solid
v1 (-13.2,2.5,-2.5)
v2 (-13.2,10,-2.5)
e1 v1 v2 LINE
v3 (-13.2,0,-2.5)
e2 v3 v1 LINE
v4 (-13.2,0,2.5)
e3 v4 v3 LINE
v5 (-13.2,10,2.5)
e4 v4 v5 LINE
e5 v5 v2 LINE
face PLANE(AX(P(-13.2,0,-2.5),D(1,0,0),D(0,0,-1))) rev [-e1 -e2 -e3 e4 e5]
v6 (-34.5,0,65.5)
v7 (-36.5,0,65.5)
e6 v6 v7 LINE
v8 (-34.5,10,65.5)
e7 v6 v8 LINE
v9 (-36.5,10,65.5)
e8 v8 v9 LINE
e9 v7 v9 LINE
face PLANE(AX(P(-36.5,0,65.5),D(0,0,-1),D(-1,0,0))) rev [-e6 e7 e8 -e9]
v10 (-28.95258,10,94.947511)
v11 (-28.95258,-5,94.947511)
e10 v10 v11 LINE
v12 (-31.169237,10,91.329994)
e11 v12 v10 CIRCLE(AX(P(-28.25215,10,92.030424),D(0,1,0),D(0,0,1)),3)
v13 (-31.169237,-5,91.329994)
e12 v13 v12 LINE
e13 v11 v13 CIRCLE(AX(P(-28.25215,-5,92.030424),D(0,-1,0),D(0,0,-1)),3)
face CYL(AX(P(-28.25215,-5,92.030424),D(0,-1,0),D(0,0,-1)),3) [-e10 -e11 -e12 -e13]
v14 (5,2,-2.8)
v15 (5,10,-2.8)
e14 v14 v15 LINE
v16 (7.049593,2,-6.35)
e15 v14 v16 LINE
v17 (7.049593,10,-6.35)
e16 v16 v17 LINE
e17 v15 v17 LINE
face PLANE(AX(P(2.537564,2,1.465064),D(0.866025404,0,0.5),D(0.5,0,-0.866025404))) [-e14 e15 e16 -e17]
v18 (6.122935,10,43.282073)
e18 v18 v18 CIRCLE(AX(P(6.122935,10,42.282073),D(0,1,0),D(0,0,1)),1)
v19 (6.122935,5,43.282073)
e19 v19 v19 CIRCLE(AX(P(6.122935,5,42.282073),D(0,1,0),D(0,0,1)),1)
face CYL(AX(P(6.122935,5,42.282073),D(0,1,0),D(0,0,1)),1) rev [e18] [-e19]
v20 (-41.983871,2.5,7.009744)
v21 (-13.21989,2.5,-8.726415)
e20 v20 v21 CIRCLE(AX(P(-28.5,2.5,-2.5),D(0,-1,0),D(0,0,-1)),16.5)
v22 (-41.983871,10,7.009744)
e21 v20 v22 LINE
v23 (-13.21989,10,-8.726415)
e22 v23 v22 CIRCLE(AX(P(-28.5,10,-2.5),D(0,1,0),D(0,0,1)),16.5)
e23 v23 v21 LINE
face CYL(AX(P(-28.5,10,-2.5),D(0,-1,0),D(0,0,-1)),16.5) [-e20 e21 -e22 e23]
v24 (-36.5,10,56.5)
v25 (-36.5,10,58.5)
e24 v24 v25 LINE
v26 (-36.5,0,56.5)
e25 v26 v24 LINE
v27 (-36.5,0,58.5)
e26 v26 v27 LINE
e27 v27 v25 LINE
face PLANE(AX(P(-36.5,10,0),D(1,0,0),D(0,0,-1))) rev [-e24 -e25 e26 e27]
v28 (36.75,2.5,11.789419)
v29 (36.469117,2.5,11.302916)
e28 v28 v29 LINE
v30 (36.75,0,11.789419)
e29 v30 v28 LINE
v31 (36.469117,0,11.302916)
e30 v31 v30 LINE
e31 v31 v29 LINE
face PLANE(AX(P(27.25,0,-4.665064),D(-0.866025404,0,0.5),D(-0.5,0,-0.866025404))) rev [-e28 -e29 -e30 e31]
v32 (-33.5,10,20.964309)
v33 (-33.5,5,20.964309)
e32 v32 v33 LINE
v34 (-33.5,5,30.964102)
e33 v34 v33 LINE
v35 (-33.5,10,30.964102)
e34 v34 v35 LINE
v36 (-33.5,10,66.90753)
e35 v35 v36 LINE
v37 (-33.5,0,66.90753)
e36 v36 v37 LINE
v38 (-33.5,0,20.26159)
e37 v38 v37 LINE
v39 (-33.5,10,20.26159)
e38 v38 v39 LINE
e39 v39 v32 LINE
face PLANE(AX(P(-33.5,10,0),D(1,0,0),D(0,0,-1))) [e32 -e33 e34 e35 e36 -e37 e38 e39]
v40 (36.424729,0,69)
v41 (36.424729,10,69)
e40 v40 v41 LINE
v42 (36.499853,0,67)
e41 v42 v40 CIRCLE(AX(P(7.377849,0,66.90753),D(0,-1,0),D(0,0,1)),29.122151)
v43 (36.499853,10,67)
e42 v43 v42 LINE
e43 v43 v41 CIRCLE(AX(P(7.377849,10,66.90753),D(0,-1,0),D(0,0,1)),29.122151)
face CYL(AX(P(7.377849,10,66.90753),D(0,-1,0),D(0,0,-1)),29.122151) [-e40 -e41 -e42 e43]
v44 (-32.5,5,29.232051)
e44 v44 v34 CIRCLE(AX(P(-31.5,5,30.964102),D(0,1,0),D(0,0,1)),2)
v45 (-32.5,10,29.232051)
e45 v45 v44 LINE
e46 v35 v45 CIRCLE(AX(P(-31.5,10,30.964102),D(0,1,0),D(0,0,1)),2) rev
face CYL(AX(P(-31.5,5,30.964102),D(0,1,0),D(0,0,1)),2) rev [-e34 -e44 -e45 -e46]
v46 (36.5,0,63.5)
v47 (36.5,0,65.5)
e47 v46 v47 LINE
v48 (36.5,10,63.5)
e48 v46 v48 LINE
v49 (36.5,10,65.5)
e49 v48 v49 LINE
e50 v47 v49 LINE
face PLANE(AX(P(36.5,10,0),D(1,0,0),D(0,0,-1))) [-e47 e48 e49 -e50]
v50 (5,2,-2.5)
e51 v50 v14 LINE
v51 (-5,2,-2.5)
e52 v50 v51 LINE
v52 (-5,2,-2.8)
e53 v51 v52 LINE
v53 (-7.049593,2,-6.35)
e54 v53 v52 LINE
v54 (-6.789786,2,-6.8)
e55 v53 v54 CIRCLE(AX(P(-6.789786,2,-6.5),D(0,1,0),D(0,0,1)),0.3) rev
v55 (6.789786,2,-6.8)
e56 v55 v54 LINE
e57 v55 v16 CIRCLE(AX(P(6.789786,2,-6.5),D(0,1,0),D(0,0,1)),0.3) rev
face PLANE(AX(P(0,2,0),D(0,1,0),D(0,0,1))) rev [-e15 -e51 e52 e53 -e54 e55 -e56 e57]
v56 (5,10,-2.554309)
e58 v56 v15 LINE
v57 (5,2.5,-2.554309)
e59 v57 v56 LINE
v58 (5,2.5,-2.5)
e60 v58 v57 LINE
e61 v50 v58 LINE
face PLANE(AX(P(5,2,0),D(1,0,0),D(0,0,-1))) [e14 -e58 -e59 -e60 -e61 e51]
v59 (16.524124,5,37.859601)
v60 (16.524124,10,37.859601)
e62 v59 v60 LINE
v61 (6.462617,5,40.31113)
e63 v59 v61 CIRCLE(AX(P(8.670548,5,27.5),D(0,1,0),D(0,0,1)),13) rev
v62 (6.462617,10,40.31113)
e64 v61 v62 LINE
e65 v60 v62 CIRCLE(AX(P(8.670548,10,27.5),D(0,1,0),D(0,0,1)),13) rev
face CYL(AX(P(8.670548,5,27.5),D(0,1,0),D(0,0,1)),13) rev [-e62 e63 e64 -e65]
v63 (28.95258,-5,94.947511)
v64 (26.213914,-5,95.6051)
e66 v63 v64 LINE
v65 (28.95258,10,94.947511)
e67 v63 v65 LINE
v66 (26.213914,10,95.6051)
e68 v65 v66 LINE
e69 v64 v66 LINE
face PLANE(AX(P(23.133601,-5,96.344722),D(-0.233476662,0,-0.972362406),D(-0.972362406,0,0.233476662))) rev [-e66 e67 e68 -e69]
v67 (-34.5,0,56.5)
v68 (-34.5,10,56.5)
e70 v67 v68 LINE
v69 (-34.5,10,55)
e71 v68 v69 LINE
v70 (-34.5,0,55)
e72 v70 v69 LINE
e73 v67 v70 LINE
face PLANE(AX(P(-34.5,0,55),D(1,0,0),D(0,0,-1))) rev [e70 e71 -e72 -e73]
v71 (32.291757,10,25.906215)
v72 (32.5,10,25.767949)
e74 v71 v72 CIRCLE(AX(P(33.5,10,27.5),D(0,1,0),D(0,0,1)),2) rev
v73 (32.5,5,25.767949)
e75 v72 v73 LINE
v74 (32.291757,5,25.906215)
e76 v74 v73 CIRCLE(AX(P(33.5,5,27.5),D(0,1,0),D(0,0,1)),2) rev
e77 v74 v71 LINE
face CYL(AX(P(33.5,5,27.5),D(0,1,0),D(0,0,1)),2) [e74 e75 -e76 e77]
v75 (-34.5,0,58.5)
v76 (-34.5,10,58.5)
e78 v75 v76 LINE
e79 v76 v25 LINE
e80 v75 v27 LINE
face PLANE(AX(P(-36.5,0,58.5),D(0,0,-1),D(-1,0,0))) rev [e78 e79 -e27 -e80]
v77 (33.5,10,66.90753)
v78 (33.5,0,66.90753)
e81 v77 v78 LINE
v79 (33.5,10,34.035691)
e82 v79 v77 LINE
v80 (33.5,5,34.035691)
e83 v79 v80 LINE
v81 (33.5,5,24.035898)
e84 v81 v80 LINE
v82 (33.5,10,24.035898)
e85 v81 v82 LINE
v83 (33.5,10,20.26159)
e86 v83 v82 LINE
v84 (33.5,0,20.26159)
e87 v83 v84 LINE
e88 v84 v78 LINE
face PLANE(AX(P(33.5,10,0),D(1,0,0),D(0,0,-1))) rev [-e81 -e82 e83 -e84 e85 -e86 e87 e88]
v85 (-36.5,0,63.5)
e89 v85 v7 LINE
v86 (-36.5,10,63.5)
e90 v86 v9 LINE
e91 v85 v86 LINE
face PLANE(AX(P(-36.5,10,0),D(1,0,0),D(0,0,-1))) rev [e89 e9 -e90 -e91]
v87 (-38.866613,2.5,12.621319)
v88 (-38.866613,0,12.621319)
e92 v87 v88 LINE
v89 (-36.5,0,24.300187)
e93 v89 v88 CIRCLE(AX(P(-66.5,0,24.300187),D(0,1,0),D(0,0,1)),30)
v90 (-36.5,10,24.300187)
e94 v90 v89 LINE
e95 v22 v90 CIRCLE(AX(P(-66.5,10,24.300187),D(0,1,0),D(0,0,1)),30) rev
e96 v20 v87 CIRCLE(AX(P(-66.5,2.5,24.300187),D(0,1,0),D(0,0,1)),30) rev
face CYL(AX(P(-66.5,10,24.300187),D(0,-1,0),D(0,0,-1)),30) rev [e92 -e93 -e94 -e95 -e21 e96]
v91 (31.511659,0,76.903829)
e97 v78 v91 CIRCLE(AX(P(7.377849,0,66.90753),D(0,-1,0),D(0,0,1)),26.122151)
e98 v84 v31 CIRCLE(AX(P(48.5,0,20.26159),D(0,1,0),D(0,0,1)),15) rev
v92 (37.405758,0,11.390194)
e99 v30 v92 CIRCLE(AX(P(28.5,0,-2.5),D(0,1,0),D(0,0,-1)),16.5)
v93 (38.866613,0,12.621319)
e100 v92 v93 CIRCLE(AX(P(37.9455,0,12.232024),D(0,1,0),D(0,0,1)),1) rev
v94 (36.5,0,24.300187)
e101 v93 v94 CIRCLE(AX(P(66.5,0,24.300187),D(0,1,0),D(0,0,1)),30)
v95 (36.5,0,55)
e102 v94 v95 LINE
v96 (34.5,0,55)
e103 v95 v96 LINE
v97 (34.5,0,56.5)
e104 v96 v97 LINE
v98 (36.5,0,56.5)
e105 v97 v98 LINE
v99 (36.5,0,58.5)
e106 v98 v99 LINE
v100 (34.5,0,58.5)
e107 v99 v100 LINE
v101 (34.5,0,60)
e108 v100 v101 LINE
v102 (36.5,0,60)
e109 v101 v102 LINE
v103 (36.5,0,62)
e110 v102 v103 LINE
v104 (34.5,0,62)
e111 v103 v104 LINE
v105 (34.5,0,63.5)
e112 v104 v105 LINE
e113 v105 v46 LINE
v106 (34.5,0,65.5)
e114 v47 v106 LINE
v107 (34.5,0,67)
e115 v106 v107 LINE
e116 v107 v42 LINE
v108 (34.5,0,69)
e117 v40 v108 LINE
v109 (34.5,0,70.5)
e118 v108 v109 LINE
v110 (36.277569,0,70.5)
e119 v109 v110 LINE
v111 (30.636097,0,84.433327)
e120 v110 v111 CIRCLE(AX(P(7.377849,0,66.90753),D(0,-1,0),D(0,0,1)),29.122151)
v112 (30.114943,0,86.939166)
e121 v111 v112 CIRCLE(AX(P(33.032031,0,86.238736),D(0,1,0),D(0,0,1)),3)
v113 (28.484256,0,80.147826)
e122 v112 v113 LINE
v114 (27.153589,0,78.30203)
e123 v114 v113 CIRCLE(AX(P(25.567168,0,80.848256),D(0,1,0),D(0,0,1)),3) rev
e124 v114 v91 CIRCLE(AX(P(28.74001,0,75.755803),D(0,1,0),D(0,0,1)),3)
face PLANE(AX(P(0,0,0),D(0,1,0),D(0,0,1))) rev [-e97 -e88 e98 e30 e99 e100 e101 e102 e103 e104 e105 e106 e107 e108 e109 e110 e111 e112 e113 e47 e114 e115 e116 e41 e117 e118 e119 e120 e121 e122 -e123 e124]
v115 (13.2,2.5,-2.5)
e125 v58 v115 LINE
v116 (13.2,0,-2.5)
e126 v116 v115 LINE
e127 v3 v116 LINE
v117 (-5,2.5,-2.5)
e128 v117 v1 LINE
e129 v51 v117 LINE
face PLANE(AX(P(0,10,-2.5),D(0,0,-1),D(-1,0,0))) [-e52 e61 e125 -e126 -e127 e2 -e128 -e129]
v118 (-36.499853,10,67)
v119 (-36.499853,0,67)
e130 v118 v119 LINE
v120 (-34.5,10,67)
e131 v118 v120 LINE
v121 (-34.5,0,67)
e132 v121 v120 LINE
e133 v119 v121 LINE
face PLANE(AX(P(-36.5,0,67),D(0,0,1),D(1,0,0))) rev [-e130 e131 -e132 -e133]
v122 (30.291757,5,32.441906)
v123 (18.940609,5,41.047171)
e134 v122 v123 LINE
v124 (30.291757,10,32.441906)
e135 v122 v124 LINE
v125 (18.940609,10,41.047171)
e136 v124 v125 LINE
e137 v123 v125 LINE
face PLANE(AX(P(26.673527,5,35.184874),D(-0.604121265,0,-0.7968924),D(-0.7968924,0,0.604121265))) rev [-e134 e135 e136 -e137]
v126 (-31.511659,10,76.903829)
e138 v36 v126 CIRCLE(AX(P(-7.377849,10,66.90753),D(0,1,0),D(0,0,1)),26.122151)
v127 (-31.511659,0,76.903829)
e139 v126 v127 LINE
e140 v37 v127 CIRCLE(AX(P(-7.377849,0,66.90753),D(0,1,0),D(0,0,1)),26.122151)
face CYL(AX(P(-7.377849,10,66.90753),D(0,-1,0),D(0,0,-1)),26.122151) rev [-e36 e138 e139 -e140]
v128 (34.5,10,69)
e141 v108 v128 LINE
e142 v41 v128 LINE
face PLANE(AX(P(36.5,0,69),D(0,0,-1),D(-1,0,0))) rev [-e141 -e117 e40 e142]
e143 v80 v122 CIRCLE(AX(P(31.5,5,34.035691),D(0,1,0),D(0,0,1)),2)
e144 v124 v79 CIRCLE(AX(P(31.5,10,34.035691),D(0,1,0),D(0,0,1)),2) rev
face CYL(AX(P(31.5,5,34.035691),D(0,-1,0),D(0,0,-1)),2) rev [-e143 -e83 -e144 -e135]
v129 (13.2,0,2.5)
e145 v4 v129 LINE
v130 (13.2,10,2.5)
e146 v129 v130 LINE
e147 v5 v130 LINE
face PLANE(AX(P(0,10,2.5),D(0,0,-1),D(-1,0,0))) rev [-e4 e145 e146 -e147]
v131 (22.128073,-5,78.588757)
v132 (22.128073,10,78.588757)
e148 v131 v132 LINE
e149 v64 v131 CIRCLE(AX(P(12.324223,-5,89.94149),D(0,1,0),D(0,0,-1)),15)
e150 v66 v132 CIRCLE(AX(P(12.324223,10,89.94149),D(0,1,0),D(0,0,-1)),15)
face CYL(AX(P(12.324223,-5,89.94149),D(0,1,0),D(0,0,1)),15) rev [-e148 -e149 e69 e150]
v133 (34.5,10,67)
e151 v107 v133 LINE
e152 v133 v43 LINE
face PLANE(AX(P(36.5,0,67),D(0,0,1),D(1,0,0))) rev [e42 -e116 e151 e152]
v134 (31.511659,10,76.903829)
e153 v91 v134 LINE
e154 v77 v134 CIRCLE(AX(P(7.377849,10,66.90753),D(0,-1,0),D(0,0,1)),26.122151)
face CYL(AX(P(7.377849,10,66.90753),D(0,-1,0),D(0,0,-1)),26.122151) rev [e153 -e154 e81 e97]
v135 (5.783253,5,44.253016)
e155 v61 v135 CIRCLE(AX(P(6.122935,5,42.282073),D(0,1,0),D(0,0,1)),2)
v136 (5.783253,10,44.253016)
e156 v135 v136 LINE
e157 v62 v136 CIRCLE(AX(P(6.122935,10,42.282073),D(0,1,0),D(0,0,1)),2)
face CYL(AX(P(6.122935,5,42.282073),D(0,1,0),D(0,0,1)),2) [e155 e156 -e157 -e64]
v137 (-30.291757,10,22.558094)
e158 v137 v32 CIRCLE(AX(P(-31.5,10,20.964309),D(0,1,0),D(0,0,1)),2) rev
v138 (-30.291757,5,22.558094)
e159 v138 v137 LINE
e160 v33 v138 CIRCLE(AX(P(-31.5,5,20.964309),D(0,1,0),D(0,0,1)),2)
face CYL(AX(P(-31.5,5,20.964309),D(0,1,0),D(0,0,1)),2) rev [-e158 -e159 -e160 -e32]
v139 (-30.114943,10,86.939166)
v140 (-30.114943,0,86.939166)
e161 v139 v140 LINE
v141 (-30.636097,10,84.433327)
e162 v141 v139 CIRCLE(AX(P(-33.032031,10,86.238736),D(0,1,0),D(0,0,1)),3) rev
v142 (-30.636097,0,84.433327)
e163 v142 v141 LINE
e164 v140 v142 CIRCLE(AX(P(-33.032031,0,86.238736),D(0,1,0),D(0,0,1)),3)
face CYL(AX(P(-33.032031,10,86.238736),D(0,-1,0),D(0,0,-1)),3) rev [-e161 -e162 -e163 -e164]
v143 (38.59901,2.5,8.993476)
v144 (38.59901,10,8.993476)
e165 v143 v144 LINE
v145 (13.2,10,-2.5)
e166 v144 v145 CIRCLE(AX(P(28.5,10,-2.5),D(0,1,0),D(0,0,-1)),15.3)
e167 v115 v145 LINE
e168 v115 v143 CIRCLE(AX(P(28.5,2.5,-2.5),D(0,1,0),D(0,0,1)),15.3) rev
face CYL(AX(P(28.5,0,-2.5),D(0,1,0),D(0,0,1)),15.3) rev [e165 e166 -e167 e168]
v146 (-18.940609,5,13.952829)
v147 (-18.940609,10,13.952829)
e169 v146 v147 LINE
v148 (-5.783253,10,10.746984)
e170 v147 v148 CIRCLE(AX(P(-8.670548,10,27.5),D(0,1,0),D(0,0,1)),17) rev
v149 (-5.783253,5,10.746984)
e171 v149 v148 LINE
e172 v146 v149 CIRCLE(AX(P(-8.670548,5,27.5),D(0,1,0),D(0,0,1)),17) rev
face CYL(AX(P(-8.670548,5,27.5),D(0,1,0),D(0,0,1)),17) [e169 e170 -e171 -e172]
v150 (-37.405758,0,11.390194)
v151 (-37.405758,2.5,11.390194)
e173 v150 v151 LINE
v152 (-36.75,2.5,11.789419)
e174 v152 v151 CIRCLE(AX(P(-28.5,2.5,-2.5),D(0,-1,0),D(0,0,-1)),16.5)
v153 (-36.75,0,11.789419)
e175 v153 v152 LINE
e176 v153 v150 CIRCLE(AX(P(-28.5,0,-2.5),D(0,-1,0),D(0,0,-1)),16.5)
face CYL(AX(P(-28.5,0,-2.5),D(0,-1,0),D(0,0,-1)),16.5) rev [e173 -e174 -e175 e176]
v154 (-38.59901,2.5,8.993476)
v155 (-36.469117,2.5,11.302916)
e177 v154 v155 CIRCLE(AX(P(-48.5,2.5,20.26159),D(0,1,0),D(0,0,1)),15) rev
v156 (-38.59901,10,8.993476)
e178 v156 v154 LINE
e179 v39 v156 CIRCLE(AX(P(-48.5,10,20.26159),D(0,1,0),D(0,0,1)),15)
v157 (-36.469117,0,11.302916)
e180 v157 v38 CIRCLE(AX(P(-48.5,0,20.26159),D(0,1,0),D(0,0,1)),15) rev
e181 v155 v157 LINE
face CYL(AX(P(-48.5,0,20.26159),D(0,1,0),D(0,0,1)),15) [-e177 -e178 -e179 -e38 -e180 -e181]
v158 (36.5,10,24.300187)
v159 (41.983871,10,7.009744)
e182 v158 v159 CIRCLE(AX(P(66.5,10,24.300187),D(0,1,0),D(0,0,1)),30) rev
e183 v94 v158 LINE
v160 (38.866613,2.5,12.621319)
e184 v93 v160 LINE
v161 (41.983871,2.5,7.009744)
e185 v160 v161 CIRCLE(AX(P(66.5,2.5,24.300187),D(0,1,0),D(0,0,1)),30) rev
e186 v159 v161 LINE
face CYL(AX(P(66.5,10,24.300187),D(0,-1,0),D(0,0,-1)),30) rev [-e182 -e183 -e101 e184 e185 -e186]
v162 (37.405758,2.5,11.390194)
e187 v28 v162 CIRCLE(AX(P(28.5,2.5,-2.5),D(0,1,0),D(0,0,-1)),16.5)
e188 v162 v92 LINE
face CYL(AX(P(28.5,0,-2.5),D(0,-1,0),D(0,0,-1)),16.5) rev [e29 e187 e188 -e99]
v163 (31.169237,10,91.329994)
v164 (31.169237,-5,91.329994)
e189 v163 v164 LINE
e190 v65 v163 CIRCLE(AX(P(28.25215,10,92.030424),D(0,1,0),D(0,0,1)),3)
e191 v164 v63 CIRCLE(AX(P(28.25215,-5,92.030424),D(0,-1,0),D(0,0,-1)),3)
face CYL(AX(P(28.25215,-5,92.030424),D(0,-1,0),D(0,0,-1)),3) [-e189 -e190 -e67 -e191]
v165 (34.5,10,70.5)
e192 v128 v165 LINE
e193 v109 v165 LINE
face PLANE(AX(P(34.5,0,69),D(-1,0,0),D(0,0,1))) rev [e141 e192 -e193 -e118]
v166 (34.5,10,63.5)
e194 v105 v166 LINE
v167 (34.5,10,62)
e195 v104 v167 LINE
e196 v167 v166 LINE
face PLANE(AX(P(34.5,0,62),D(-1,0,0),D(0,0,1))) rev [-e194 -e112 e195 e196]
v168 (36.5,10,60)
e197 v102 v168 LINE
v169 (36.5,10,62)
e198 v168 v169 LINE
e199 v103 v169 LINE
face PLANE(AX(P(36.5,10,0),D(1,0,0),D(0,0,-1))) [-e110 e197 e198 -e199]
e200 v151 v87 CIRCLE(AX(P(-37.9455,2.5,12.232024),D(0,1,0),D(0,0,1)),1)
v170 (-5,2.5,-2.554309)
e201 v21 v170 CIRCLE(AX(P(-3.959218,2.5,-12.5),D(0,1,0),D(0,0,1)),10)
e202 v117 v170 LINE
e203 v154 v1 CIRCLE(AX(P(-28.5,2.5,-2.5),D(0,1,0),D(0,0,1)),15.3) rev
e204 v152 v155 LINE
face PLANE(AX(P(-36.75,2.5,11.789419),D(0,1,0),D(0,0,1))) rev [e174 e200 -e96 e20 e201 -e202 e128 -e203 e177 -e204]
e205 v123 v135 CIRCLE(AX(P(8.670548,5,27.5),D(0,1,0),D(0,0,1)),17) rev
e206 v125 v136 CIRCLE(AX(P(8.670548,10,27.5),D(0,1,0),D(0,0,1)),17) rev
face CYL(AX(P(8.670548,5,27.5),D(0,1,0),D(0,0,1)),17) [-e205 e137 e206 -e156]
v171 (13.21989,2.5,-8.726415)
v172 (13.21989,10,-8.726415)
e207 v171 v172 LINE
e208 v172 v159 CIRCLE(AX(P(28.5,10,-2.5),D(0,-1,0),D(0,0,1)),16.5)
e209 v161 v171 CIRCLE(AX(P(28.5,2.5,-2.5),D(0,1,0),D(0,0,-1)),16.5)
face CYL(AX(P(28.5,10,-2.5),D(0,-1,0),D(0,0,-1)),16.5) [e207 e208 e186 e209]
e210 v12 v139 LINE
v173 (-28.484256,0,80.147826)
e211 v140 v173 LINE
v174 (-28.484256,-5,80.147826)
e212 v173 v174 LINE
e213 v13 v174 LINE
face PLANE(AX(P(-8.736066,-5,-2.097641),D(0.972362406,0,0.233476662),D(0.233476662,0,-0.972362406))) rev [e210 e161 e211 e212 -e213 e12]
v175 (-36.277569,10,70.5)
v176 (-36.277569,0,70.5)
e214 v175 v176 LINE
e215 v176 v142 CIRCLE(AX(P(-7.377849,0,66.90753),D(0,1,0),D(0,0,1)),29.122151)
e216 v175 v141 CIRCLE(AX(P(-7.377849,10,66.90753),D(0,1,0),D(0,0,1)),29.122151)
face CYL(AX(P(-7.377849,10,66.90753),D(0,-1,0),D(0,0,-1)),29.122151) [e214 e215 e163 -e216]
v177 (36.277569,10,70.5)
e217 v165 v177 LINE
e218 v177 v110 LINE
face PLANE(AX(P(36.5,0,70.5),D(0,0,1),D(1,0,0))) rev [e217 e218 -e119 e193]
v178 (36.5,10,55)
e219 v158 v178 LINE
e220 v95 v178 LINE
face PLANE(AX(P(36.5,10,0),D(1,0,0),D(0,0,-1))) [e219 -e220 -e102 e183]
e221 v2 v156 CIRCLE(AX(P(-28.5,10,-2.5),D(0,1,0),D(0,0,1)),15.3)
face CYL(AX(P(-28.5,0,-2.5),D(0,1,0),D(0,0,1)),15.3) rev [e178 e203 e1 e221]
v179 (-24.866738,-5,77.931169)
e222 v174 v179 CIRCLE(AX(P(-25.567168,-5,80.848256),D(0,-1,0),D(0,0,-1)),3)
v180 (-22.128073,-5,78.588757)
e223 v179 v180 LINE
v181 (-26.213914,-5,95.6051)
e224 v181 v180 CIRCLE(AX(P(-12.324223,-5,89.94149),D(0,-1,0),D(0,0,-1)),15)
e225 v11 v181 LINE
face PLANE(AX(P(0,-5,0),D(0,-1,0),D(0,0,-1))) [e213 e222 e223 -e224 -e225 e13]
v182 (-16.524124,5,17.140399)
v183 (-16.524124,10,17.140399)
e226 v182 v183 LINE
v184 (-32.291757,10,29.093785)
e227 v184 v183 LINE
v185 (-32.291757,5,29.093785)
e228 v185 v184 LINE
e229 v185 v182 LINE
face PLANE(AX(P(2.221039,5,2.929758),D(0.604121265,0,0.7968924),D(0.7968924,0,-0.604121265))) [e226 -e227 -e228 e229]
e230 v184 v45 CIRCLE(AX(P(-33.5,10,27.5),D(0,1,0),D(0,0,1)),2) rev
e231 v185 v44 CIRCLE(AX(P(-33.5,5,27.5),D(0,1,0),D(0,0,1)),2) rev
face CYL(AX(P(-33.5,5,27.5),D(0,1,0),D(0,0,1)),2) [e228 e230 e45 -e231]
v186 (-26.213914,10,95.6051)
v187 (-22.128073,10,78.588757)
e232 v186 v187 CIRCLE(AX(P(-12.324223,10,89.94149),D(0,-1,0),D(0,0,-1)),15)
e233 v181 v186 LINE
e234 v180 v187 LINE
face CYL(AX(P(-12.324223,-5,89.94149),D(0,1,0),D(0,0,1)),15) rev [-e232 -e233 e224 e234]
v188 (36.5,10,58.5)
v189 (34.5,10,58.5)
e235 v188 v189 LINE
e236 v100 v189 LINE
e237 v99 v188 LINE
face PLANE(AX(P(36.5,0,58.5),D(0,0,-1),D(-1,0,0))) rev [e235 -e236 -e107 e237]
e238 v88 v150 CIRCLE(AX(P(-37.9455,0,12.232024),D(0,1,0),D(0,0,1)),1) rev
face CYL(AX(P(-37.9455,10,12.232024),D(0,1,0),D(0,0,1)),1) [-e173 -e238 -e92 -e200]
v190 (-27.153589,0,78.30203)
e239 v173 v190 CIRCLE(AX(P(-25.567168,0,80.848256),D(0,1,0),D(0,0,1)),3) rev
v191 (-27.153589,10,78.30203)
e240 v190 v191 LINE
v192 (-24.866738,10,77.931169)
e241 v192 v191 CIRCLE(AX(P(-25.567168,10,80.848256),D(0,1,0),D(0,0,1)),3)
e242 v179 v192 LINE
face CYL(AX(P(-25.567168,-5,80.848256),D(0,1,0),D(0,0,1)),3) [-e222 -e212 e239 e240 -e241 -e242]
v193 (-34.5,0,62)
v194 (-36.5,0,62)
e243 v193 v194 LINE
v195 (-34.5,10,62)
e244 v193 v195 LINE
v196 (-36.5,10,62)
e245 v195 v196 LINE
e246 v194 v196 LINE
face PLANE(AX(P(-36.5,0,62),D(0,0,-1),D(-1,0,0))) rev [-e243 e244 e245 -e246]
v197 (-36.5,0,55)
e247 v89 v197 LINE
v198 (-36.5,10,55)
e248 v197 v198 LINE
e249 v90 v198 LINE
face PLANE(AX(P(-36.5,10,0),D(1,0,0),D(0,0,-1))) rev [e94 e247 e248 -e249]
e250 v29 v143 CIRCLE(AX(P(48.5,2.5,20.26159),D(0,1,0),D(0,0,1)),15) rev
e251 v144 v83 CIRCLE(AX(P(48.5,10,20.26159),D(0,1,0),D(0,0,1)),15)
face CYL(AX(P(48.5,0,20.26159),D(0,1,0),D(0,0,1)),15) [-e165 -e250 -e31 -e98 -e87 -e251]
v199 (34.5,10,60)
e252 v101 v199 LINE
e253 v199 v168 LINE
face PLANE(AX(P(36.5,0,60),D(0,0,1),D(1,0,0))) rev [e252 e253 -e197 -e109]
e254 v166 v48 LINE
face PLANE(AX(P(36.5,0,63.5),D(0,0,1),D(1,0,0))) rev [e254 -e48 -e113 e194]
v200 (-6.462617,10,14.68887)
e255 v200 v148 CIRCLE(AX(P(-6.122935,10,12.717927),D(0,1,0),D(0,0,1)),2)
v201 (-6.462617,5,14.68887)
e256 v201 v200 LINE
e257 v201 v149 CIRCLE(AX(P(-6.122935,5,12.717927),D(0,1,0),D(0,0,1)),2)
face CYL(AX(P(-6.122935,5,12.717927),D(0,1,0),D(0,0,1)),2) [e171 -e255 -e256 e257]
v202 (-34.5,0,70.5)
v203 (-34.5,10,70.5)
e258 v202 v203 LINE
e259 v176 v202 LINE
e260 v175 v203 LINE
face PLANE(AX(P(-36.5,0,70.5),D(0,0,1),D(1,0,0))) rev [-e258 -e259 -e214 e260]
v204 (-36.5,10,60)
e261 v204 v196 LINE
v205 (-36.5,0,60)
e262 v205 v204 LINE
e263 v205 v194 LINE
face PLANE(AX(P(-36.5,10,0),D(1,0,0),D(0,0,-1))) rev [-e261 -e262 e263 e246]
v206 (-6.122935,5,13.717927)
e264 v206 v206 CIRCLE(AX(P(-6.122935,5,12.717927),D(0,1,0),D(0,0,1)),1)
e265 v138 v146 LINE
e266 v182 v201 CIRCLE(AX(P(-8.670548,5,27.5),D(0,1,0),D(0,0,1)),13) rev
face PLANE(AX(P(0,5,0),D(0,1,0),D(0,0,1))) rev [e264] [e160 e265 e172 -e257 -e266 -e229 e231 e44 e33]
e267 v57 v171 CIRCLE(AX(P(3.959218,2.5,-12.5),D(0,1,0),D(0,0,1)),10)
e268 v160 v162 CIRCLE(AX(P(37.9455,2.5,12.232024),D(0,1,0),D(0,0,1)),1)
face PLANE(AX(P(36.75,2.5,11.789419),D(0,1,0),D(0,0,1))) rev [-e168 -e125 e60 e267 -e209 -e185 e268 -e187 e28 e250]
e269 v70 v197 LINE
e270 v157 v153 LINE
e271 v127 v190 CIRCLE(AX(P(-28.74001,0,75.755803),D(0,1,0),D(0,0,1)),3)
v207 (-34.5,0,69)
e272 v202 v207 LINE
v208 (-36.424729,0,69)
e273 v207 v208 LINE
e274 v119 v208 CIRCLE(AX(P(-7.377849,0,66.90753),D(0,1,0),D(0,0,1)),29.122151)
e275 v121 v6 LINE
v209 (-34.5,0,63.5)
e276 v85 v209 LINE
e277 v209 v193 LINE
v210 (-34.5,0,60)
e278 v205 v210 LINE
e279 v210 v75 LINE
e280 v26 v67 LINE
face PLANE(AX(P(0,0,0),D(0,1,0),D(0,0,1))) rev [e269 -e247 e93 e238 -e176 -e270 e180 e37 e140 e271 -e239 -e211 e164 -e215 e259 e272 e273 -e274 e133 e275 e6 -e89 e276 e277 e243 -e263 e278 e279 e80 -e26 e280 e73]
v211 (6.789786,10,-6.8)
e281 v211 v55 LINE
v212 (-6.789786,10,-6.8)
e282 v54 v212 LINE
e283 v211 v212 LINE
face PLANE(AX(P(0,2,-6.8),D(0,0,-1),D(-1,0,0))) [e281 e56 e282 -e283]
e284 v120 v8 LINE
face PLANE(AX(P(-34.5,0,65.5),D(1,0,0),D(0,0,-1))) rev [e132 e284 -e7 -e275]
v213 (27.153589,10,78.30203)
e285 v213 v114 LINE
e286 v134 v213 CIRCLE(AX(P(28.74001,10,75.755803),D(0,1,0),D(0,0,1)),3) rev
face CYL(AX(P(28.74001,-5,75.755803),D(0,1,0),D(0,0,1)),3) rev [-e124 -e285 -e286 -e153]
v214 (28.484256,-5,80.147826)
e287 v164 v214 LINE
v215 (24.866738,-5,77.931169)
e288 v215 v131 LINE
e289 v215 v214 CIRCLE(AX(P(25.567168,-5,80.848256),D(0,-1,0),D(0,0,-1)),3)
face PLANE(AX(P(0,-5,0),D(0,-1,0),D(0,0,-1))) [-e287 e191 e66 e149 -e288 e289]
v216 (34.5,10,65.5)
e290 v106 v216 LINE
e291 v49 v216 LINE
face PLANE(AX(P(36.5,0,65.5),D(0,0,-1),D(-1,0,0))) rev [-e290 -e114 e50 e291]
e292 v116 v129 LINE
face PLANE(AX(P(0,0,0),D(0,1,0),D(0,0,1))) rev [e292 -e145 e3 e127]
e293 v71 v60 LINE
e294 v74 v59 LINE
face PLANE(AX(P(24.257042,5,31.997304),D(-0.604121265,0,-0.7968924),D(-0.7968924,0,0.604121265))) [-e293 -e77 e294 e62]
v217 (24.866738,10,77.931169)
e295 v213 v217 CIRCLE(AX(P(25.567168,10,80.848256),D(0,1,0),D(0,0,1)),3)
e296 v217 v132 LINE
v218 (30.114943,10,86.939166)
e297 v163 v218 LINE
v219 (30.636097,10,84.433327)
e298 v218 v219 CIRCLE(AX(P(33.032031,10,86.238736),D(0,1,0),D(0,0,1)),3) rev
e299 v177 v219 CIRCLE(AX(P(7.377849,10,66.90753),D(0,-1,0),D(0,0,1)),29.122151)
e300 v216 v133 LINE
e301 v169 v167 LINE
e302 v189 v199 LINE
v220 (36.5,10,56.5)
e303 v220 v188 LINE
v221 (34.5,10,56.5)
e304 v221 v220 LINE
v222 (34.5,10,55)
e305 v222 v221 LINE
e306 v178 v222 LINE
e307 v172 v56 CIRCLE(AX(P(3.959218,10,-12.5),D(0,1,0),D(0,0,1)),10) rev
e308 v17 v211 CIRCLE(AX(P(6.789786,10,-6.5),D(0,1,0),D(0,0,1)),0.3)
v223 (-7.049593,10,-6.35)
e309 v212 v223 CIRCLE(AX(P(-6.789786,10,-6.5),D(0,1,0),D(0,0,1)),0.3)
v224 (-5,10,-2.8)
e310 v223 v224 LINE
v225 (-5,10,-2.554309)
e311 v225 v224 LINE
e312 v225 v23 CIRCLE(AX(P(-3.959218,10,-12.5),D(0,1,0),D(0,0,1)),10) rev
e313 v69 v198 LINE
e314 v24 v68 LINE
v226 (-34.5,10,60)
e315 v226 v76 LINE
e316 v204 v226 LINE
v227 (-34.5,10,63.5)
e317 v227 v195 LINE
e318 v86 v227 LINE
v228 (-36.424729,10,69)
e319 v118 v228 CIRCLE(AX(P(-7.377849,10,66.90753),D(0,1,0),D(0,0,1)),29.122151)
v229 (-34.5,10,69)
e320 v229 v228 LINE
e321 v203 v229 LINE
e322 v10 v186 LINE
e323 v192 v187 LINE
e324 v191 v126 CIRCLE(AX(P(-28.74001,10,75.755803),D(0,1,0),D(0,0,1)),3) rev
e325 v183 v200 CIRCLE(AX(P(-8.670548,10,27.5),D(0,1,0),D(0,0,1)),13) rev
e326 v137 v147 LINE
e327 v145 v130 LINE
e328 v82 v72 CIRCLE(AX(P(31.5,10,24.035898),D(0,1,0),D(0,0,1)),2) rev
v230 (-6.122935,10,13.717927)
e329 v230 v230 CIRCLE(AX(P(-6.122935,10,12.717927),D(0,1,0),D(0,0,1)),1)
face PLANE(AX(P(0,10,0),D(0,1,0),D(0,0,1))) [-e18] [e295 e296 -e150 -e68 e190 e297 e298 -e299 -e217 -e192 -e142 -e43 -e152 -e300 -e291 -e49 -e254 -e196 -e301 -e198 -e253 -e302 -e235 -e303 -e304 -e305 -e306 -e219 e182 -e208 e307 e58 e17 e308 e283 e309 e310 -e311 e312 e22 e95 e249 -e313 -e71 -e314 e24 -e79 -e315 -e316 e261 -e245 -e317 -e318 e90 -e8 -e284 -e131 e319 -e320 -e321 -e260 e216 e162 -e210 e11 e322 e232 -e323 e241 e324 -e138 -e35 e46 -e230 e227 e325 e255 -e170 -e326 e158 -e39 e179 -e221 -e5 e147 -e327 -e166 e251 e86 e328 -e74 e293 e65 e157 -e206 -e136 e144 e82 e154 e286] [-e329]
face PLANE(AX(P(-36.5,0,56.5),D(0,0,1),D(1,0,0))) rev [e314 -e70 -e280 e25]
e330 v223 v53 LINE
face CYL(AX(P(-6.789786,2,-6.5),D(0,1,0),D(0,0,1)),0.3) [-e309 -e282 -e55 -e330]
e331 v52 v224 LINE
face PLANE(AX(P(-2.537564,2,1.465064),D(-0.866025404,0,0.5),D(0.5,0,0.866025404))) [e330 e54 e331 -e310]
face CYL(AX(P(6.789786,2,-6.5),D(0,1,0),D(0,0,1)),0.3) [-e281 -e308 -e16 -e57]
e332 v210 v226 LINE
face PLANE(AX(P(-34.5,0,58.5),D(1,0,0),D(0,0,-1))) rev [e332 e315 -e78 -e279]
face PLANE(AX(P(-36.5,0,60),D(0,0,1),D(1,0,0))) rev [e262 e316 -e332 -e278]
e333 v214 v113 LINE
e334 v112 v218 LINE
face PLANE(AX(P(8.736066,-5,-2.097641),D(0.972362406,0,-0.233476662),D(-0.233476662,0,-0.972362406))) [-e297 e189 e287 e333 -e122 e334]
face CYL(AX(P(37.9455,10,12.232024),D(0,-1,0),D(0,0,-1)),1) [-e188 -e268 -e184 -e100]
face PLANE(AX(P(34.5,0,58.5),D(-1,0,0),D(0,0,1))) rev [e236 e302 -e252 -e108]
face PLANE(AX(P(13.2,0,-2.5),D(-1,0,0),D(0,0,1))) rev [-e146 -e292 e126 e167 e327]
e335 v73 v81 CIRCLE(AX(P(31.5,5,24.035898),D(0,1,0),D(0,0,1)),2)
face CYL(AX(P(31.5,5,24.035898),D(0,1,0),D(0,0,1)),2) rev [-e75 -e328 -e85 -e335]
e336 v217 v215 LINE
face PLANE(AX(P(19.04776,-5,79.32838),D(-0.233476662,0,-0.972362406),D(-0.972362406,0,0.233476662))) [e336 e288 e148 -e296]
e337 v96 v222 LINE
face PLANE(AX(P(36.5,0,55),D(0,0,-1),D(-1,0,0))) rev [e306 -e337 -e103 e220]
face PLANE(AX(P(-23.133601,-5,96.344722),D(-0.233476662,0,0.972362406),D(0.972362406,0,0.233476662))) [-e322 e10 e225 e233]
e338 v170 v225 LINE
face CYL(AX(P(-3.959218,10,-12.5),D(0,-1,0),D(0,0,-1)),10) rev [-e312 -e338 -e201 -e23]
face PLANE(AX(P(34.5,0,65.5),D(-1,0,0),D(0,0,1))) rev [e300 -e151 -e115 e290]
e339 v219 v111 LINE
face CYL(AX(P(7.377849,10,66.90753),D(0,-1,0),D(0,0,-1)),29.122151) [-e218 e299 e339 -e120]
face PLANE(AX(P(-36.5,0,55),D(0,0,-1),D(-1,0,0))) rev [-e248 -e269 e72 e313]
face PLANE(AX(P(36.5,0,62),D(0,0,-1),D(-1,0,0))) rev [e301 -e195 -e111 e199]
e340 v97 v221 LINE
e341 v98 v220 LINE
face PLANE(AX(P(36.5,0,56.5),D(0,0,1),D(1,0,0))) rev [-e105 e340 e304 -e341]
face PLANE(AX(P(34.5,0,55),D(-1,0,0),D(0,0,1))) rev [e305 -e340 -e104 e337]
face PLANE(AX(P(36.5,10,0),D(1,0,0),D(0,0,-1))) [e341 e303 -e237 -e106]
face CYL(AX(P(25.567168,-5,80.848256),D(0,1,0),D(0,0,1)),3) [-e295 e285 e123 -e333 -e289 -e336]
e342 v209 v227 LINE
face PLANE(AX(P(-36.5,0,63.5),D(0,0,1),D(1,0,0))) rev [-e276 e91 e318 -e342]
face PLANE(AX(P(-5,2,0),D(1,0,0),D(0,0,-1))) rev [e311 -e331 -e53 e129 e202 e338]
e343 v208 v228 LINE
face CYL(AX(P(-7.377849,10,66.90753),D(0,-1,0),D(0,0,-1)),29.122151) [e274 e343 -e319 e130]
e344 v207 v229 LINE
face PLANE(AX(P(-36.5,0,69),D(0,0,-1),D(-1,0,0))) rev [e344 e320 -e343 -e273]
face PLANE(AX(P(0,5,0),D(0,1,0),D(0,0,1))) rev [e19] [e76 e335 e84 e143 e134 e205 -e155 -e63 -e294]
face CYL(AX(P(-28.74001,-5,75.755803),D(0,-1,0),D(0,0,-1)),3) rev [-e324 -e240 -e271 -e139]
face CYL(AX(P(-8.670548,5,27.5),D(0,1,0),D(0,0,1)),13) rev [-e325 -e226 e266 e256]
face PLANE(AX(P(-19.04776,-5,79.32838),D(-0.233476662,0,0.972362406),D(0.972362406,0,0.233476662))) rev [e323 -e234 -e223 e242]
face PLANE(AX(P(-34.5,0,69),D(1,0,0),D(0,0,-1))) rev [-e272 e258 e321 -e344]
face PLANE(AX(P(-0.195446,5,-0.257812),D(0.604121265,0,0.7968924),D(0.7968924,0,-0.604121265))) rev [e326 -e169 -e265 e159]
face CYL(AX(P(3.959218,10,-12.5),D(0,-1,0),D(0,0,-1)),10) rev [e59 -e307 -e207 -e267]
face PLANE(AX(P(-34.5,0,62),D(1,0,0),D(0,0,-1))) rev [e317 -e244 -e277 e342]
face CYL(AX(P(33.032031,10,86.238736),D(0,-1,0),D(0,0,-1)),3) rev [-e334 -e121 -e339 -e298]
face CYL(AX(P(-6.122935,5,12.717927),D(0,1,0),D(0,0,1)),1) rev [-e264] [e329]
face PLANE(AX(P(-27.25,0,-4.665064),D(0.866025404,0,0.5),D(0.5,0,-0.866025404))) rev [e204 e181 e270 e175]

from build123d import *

# Parameters (mm, degrees)
BOSS_EXTRUDE1_DEPTH = 10
FILLET2_R           = 30
SKETCH6_R           = 1
BOSS_EXTRUDE2_DEPTH = 5
SKETCH4_W           = 2
SKETCH4_H           = 1.5
CUT_EXTRUDE1_DEPTH  = 99.900202224
FILLET3_R           = 15
CUT_REVOLVE1_START  = -1
CUT_REVOLVE1_DEPTH  = 3.5
FILLET1_R           = 10
FILLET4_R           = 1
FILLET5_R           = 2
BOSS_EXTRUDE3_START = -10
BOSS_EXTRUDE3_DEPTH = 15
DELETEFACE1_DEPTH   = 11
FILLET6_R           = 3
FILLET7_R           = 3
BOSS_EXTRUDE4_START = -10
SKETCH11_W          = 10
SKETCH11_H          = 0.3
BOSS_EXTRUDE4_DEPTH = 8
FILLET8_R           = 0.3


with BuildPart() as part:
    # Sketch2 → Boss-Extrude1 (new body)
    with BuildSketch(Plane(origin=(0, 0, 0), x_dir=(1, 0, 0), z_dir=(0, 1, 0))):
        with BuildLine():
            Line((-15, 2.5), (-15, -2.5))
            Line((-15, -2.5), (15, -2.5))
            Line((15, -2.5), (15, 2.5))
            Line((15, 2.5), (-12, 2.5))
            ThreePointArc((-12, 2.5), (-36.874067112, 16.717067208), (-36.5, -11.93086969))
            Line((-36.5, -11.93086969), (-36.5, -66.907529531))
            ThreePointArc((-36.5, -66.907529531), (-34.28320825, -78.052094241), (-27.970319449, -87.5))
            Line((-27.970319449, -87.5), (-25.848999105, -85.378679656))
            ThreePointArc((-25.848999105, -85.378679656), (-31.511569653, -76.904043944), (-33.5, -66.907529531))
            Line((-33.5, -66.907529531), (-33.5, -10.039936204))
            ThreePointArc((-33.5, -10.039936204), (-36.074628704, 13.674748319), (-15, 2.5))
        make_face()
    boss_extrude1 = extrude(amount=BOSS_EXTRUDE1_DEPTH)

    # Mirror2: Boss-Extrude1 across plane
    add(boss_extrude1.mirror(Plane(origin=(0, 0, 0), x_dir=(0, 0, 1), z_dir=(1, 0, 0))))

    # Fillet2
    fillet2_edges = [part.edges().sort_by_distance(p)[0] for p in [
        (-36.5, 5, 11.93086969),
        (36.5, 5, 11.93086969),
    ]]
    fillet(fillet2_edges, radius=FILLET2_R)

    # Sketch6 → Boss-Extrude2 (add)
    # profile 1 of 2: a face of its own
    with BuildSketch(Plane(origin=(0, 10, 0), x_dir=(1, 0, 0), z_dir=(0, 1, 0))):
        with BuildLine():
            Line((-32.29175747, -29.0937848), (-16.524124365, -17.1403988))
            ThreePointArc((-16.524124365, -17.1403988), (-11.748018495, -14.869514069), (-6.462616651, -14.688870483))
            ThreePointArc((-6.462616651, -14.688870483), (-4.151991915, -13.057609213), (-5.783253184, -10.746984477))
            ThreePointArc((-5.783253184, -10.746984477), (-12.694932518, -10.983210705), (-18.940609425, -13.9528292))
            Line((-18.940609425, -13.9528292), (-34.70824253, -25.9062152))
            ThreePointArc((-34.70824253, -25.9062152), (-35.0937848, -28.70824253), (-32.29175747, -29.0937848))
        make_face()
        with Locations(Location((-6.122934918, -12.71792748, 0), (0, 0, 270))):
            Circle(SKETCH6_R, mode=Mode.SUBTRACT)
    # profile 2 of 2: a face of its own
    with BuildSketch(Plane(origin=(0, 10, 0), x_dir=(1, 0, 0), z_dir=(0, 1, 0))):
        with BuildLine():
            Line((32.29175747, -25.9062152), (16.524124365, -37.8596012))
            ThreePointArc((16.524124365, -37.8596012), (11.748018495, -40.130485931), (6.462616651, -40.311129517))
            ThreePointArc((6.462616651, -40.311129517), (4.151991915, -41.942390787), (5.783253184, -44.253015523))
            ThreePointArc((5.783253184, -44.253015523), (12.694932518, -44.016789295), (18.940609425, -41.0471708))
            Line((18.940609425, -41.0471708), (34.70824253, -29.0937848))
            ThreePointArc((34.70824253, -29.0937848), (35.0937848, -26.29175747), (32.29175747, -25.9062152))
        make_face()
        with Locations(Location((6.122934918, -42.28207252, 0), (0, 0, 270))):
            Circle(SKETCH6_R, mode=Mode.SUBTRACT)
    extrude(amount=-BOSS_EXTRUDE2_DEPTH)

    # Sketch4 → Cut-Extrude1 (cut, through all)
    with BuildSketch(Plane(origin=(0, 10, 0), x_dir=(1, 0, 0), z_dir=(0, 1, 0))):
        with BuildLine():
            Line((-13.2, 2.5), (-13.2, -2.5))
            Line((-13.2, -2.5), (-14.040055325, -2.5))
            ThreePointArc((-14.040055325, -2.5), (-43.588524672, 5.0350391), (-13.2, 2.5))
        make_face()
        with Locations((-35.5, -59.25)):
            Rectangle(SKETCH4_W, SKETCH4_H)
        with Locations((-35.5, -62.75)):
            Rectangle(SKETCH4_W, SKETCH4_H)
        with Locations((-35.5, -55.75)):
            Rectangle(SKETCH4_W, SKETCH4_H)
        with Locations((-35.5, -66.25)):
            Rectangle(SKETCH4_W, SKETCH4_H)
        with Locations((-35.5, -69.75)):
            Rectangle(SKETCH4_W, SKETCH4_H)
        with Locations((35.5, -69.75)):
            Rectangle(SKETCH4_W, SKETCH4_H)
        with Locations((35.5, -66.25)):
            Rectangle(SKETCH4_W, SKETCH4_H)
        with Locations((35.5, -62.75)):
            Rectangle(SKETCH4_W, SKETCH4_H)
        with Locations((35.5, -55.75)):
            Rectangle(SKETCH4_W, SKETCH4_H)
        with Locations((35.5, -59.25)):
            Rectangle(SKETCH4_W, SKETCH4_H)
        with BuildLine():
            Line((13.2, -2.5), (14.040055325, -2.5))
            ThreePointArc((14.040055325, -2.5), (43.588524672, 5.0350391), (13.2, 2.5))
            Line((13.2, 2.5), (13.2, -2.5))
        make_face()
    extrude(amount=-CUT_EXTRUDE1_DEPTH, mode=Mode.SUBTRACT)

    # Fillet3
    fillet3_edges = [part.edges().sort_by_distance(p)[0] for p in [
        (33.5, 5, 11.959944675),
        (-33.5, 5, 11.959944675),
    ]]
    fillet(fillet3_edges, radius=FILLET3_R)

    # Cut-Revolve1: read off the stored shape, not the designer's step
    # Cut-Revolve1 outline → Cut-Revolve1 (cut)
    with BuildSketch(Plane(origin=(0, 0, 0), x_dir=(1, 0, 0), z_dir=(0, 1, 0)).offset(CUT_REVOLVE1_START)):
        with BuildLine():
            ThreePointArc((-41.983870968, -7.00974362), (-39.626617248, -9.683939782), (-36.75, -11.789419162))
            Line((-36.75, -11.789419162), (-36.469117037, -11.3029156))
            ThreePointArc((-36.469117037, -11.3029156), (-37.473434742, -10.092280811), (-38.599009901, -8.993476368))
            ThreePointArc((-38.599009901, -8.993476368), (-34.807739235, 16.439240501), (-13.2, 2.5))
            Line((-13.2, 2.5), (-12, 2.5))
            ThreePointArc((-12, 2.5), (-33.488292745, 18.227903086), (-41.983870968, -7.00974362))
        make_face()
    cut_revolve1 = extrude(amount=CUT_REVOLVE1_DEPTH, mode=Mode.SUBTRACT)

    # Mirror3: Cut-Revolve1 across plane
    add(cut_revolve1.mirror(Plane(origin=(0, 0, 0), x_dir=(0, 0, 1), z_dir=(1, 0, 0))), mode=Mode.SUBTRACT)

    # Fillet1
    fillet1_edges = [part.edges().sort_by_distance(p)[0] for p in [
        (-12, 6.25, -2.5),
        (12, 6.25, -2.5),
    ]]
    fillet(fillet1_edges, radius=FILLET1_R)

    # Fillet4
    # the kernel refuses this fillet: 1 mm, written as the material it takes off along each edge
    with BuildSketch(Plane(origin=(41.983870968, -16.048184468, 7.00974362), x_dir=(-0.7225326531123375, 0, 0.6913367957706624), z_dir=(0, 1, 0))) as fillet4_piece_1:
        with BuildLine():
            CenterArc((6.528208905, 0.981393724), FILLET4_R, 113.353303502, 145.576812808)
            ThreePointArc((6.131809124, 1.899471723), (3.116855905, 0.785256492), (0, 0))
            ThreePointArc((0, 0), (3.168101381, 0.307003562), (6.336202761, 0))
        make_face()
    extrude(amount=18.548184468, mode=Mode.SUBTRACT)
    with BuildSketch(Plane(origin=(-41.983870968, -16.048184468, 7.00974362), x_dir=(0.7225326531123378, 0, 0.6913367957706622), z_dir=(0, 1, 0))) as fillet4_piece_2:
        with BuildLine():
            CenterArc((6.528208905, -0.981393724), FILLET4_R, 101.06988369, 145.576812808)
            ThreePointArc((6.131809124, -1.899471723), (3.116855905, -0.785256492), (0, 0))
            ThreePointArc((0, 0), (3.168101381, -0.307003562), (6.336202761, 0))
        make_face()
    extrude(amount=18.548184468, mode=Mode.SUBTRACT)

    # Fillet5
    fillet5_edges = [part.edges().sort_by_distance(p)[0] for p in [
        (-33.5, 7.5, 29.5),
        (-33.5, 7.5, 24.99025088),
        (33.5, 7.5, 25.5),
        (33.5, 7.5, 30.00974912),
    ]]
    fillet(fillet5_edges, radius=FILLET5_R)

    # Sketch8 → Boss-Extrude3 (add)
    with BuildSketch(Plane.XZ.offset(BOSS_EXTRUDE3_START)):
        with BuildLine():
            Line((-26.213914484, 95.605099549), (-31.869667291, 94.247080891))
            Line((-31.869667291, 94.247080891), (-27.783825698, 77.230738791))
            Line((-27.783825698, 77.230738791), (-22.128072891, 78.588757448))
            ThreePointArc((-22.128072891, 78.588757448), (-26.909659277, 86.439339828), (-26.213914484, 95.605099549))
        make_face()
    boss_extrude3 = extrude(amount=BOSS_EXTRUDE3_DEPTH)

    # Mirror4: Boss-Extrude3 across plane
    add(boss_extrude3.mirror(Plane(origin=(0, 0, 0), x_dir=(0, 0, 1), z_dir=(1, 0, 0))))

    # DeleteFace1: read off the stored shape, not the designer's step
    # DeleteFace1 outline → DeleteFace1 (cut)
    with BuildSketch(Plane(origin=(0, 0, 0), x_dir=(1, 0, 0), z_dir=(0, 1, 0))):
        with BuildLine():
            Line((25.848999105, -85.378679656), (26.909659277, -86.439339828))
            ThreePointArc((26.909659277, -86.439339828), (26.685366049, -85.610488056), (26.414012779, -84.795828548))
            ThreePointArc((26.414012779, -84.795828548), (26.133770133, -85.089449001), (25.848999105, -85.378679656))
        make_face()
        with BuildLine():
            Line((-26.909659277, -86.439339828), (-25.848999105, -85.378679656))
            ThreePointArc((-25.848999105, -85.378679656), (-26.133770133, -85.089449001), (-26.414012779, -84.795828548))
            ThreePointArc((-26.414012779, -84.795828548), (-26.685366049, -85.610488056), (-26.909659277, -86.439339828))
        make_face()
    extrude(amount=DELETEFACE1_DEPTH, mode=Mode.SUBTRACT)

    # Fillet6
    fillet6_edges = [part.edges().sort_by_distance(p)[0] for p in [
        (-31.869667291, 2.5, 94.247080891),
        (-29.774582906, 5, 85.521663663),
        (-27.783825698, 2.5, 77.230738791),
        (29.774582906, 5, 85.521663663),
        (27.783825698, 2.5, 77.230738791),
        (31.869667291, 2.5, 94.247080891),
    ]]
    fillet(fillet6_edges, radius=FILLET6_R)

    # Fillet7
    # the kernel refuses this fillet: 3 mm, written as the material it adds along each edge
    with BuildSketch(Plane(origin=(28.870158832, 10, 81.755000397), x_dir=(-0.4451552484524621, 0, -0.8954534073726151), z_dir=(0, -1, 0))) as fillet7_piece_1:
        with BuildLine():
            CenterArc((5.429938119, 2.554031947), FILLET7_R, 138.932760823, 99.425389741)
            Line((3.168120681, 4.524864735), (2.941938938, 4.721948013))
            ThreePointArc((2.941938938, 4.721948013), (1.218371107, 2.518472645), (-0.262566045, 0.145117443))
            Line((-0.262566045, 0.145117443), (0.067135427, -0.292391577))
            ThreePointArc((0.067135427, -0.292391577), (1.678072021, 0.077492249), (3.698732127, -0.255403195))
            Line((3.698732127, -0.255403195), (3.85611449, 0))
        make_face()
    extrude(amount=10)
    with BuildSketch(Plane(origin=(-28.870158832, 10, 81.755000397), x_dir=(-0.47821106545327013, 0, -0.8782449412766623), z_dir=(0, -1, 0))) as fillet7_piece_2:
        with BuildLine():
            CenterArc((5.206526078, 2.983185104), FILLET7_R, 176.643750304, 99.425389741)
            Line((2.21167161, 3.158817444), (1.912186163, 3.176380678))
            ThreePointArc((1.912186163, 3.176380678), (1.025936374, 1.330182436), (-0.201013248, 0.222696372))
            Line((-0.201013248, 0.222696372), (-0.031718549, -0.29831851))
            ThreePointArc((-0.031718549, -0.29831851), (2.761855785, -0.446413754), (5.55543012, -0.29831851))
            Line((5.55543012, -0.29831851), (5.523711571, 0))
        make_face()
    extrude(amount=10)

    # Sketch11 → Boss-Extrude4 (add)
    with BuildSketch(Plane.XZ.offset(BOSS_EXTRUDE4_START)):
        Polygon((-7.309401077, -6.8), (7.309401077, -6.8), (5, -2.8), (-5, -2.8), align=None)
        with Locations((0, -2.65)):
            Rectangle(SKETCH11_W, SKETCH11_H)
    extrude(amount=BOSS_EXTRUDE4_DEPTH)

    # Fillet8
    fillet8_edges = [part.edges().sort_by_distance(p)[0] for p in [
        (-7.309401077, 6, -6.8),
        (7.309401077, 6, -6.8),
    ]]
    fillet(fillet8_edges, radius=FILLET8_R)


solid = part.part
